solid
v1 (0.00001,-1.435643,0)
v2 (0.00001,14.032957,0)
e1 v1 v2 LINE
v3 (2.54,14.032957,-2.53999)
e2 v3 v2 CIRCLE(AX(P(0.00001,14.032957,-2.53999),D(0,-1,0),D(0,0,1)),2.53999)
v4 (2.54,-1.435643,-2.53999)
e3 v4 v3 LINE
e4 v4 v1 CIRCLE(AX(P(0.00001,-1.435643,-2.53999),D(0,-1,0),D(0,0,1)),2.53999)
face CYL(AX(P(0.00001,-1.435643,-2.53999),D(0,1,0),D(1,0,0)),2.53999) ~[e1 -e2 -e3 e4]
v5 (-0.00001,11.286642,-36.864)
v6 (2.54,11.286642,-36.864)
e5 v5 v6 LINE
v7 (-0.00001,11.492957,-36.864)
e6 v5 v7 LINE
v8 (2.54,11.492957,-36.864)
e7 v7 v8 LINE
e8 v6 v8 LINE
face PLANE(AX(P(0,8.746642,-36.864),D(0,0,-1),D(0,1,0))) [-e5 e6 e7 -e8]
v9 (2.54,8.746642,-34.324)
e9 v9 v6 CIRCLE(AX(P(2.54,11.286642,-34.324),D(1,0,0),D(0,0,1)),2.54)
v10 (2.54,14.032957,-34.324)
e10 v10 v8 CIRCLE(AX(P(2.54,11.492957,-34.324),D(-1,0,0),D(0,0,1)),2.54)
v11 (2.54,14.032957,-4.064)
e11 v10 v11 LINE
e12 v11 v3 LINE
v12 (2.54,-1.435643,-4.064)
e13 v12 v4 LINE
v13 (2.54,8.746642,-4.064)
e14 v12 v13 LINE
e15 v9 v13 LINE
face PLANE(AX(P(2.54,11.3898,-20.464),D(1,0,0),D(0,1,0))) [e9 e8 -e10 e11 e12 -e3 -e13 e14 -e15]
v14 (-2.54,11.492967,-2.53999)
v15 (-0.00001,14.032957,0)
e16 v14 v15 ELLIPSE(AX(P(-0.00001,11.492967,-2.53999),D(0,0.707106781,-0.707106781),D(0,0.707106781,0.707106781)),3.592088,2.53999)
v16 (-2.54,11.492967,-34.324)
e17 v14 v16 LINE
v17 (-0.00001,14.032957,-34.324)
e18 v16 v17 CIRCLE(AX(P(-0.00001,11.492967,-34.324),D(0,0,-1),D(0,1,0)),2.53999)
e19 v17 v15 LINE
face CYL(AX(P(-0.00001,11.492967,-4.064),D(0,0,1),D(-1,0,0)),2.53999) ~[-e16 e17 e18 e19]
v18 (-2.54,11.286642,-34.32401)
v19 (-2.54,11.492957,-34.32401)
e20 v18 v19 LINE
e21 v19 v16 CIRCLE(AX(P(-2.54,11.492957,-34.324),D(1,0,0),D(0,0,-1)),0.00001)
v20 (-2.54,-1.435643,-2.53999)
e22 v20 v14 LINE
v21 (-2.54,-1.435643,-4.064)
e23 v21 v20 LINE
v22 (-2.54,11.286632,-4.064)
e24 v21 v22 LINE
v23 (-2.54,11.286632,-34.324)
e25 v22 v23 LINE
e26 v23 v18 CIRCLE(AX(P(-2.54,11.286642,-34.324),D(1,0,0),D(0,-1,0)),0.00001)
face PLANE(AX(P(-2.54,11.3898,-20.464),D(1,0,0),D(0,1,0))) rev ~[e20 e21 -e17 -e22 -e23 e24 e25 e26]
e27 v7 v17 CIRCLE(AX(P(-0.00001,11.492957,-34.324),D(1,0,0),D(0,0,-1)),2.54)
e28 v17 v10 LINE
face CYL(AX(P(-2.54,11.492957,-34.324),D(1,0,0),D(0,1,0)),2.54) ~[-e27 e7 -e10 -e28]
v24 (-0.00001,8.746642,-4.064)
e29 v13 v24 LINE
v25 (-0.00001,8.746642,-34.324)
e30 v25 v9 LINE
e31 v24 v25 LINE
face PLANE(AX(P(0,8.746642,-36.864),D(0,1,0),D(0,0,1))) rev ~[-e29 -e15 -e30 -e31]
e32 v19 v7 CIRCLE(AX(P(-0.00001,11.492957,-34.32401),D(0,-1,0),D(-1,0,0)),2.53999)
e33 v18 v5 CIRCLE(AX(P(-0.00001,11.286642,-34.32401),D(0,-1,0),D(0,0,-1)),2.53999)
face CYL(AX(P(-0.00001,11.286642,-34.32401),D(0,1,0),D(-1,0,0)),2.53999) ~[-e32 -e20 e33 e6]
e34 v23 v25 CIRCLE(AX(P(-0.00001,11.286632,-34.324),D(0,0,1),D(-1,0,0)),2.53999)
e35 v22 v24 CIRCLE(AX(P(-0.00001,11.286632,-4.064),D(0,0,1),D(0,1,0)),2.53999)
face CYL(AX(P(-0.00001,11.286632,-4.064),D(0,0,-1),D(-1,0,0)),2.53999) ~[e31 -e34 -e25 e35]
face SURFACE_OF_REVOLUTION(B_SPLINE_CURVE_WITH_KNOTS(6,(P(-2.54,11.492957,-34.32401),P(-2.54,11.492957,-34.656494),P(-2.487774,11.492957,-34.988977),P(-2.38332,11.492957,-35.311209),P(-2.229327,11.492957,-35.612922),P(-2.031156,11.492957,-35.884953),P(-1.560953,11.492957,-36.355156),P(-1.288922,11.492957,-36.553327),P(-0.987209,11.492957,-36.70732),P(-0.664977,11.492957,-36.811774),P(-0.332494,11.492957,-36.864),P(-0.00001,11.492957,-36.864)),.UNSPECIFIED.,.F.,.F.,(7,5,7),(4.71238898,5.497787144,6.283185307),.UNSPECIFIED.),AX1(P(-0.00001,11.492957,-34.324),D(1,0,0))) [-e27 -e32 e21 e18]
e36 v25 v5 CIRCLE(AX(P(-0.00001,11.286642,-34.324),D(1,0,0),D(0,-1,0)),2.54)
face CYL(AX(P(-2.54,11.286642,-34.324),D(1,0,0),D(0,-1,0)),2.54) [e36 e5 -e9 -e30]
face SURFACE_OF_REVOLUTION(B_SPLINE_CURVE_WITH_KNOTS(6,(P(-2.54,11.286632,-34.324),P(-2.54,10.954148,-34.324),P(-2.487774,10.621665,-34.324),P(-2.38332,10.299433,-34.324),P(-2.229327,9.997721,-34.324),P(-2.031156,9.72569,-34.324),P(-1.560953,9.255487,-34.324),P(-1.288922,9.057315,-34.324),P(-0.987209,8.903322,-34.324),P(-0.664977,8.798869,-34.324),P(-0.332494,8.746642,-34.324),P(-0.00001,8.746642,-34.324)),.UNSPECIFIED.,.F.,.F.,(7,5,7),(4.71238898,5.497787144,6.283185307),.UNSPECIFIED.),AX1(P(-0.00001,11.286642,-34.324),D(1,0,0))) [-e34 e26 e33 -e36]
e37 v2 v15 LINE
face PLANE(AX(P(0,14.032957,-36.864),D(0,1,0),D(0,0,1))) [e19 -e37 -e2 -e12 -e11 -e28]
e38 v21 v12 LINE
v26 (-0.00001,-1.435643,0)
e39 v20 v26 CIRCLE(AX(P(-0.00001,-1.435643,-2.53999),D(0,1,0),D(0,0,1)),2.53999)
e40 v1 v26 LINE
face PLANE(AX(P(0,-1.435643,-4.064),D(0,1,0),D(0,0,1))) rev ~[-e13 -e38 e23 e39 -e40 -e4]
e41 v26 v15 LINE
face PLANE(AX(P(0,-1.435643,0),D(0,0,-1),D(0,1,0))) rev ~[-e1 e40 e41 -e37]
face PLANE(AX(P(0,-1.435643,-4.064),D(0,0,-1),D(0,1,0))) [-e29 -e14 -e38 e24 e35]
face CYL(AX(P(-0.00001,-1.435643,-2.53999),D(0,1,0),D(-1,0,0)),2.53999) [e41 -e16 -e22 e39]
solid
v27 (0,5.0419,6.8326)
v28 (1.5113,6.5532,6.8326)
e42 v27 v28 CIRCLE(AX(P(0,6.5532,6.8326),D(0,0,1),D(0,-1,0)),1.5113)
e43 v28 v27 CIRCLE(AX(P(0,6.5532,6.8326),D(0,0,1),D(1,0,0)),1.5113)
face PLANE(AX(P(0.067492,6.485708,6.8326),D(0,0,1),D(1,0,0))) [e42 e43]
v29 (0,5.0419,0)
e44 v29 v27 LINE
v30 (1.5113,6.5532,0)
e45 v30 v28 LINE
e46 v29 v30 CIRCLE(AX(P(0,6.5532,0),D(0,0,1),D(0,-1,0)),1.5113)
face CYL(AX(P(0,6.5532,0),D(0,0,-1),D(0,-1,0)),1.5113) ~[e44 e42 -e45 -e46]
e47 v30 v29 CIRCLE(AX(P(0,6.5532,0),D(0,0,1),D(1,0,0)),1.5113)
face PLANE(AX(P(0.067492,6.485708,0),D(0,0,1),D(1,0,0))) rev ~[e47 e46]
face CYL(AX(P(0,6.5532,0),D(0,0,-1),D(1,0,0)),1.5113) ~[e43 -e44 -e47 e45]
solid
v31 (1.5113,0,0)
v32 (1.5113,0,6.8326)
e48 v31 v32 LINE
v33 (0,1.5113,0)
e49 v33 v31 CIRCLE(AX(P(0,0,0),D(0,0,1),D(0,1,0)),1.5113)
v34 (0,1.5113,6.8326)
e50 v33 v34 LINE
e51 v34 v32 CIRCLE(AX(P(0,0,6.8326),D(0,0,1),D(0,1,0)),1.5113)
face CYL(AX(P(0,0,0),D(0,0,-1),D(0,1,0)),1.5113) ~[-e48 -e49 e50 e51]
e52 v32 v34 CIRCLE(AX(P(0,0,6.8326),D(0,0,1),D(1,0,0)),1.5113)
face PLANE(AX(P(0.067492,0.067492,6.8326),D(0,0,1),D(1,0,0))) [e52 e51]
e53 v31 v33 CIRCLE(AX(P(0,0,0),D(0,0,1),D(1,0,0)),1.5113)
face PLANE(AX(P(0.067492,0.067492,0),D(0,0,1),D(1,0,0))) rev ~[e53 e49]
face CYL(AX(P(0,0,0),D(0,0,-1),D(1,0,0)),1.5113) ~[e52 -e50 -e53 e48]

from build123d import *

# Parameters (mm, degrees)
F1_DEPTH      = 6.8326
F2_W          = 15.4686
F2_H          = 4.064
F3_DEPTH      = 2.54
F3_DEPTH_BACK = 2.54
F4_W          = 5.2863146343
F4_H          = 32.8
F5_DEPTH      = 2.54
F5_DEPTH_BACK = 2.54
F6_R          = 2.54
F7_R          = 2.53999


# Not quite as in the source:
# - a fillet or chamfer is up to 0.001 mm smaller than in the source, because OpenCascade refuses the exact size


with BuildPart() as f1:
    # F0 (on Top) → F1 (new body)
    with BuildSketch(Plane.XY):
        with BuildLine():
            ThreePointArc((0, 5.0419), (1.0686504784, 5.4845495216), (1.5113, 6.5532))
            ThreePointArc((1.5113, 6.5532), (-1.0686504784, 7.6218504784), (0, 5.0419))
        make_face()
    extrude(amount=F1_DEPTH)


with BuildPart() as f1b:
    # F0 (on Top) → F1, piece 2 (new body)
    with BuildSketch(Plane.XY):
        with BuildLine():
            ThreePointArc((1.5113, 0), (1.0686504784, 1.0686504784), (0, 1.5113))
            ThreePointArc((0, 1.5113), (-1.0686504784, -1.0686504784), (1.5113, 0))
        make_face()
    extrude(amount=F1_DEPTH)


with BuildPart() as f3:
    # F2 (on Right) → F3 (new body, two sides)
    with BuildSketch(Plane.YZ) as f3_sk:
        with Locations((6.2986569509, -2.032)):
            Rectangle(F2_W, F2_H)
    extrude(amount=F3_DEPTH)
    extrude(f3_sk.sketch, amount=-F3_DEPTH_BACK)

    # F4 (on Right) → F5 (join, two sides)
    with BuildSketch(Plane.YZ) as f5_sk:
        with Locations((11.3897996337, -20.464)):
            Rectangle(F4_W, F4_H)
    extrude(amount=F5_DEPTH)
    extrude(f5_sk.sketch, amount=-F5_DEPTH_BACK)

    # F6
    f6_edges = [f3.edges().sort_by_distance(p)[0] for p in [
        (0, 8.746642, -36.864),
        (0, 14.032957, -36.864),
    ]]
    fillet(f6_edges, radius=F6_R)

    # F7 (radius 2.54 in the source; OpenCascade refuses exactly that, so slightly less here)
    f7_edges = [f3.edges().sort_by_distance(p)[0] for p in [
        (2.54, 6.298657, 0),
        (-2.54, 6.298657, 0),
        (-2.54, 14.032957, -17.162),
    ]]
    fillet(f7_edges, radius=F7_R)


solid = Compound([f1.part, f1b.part, f3.part])
